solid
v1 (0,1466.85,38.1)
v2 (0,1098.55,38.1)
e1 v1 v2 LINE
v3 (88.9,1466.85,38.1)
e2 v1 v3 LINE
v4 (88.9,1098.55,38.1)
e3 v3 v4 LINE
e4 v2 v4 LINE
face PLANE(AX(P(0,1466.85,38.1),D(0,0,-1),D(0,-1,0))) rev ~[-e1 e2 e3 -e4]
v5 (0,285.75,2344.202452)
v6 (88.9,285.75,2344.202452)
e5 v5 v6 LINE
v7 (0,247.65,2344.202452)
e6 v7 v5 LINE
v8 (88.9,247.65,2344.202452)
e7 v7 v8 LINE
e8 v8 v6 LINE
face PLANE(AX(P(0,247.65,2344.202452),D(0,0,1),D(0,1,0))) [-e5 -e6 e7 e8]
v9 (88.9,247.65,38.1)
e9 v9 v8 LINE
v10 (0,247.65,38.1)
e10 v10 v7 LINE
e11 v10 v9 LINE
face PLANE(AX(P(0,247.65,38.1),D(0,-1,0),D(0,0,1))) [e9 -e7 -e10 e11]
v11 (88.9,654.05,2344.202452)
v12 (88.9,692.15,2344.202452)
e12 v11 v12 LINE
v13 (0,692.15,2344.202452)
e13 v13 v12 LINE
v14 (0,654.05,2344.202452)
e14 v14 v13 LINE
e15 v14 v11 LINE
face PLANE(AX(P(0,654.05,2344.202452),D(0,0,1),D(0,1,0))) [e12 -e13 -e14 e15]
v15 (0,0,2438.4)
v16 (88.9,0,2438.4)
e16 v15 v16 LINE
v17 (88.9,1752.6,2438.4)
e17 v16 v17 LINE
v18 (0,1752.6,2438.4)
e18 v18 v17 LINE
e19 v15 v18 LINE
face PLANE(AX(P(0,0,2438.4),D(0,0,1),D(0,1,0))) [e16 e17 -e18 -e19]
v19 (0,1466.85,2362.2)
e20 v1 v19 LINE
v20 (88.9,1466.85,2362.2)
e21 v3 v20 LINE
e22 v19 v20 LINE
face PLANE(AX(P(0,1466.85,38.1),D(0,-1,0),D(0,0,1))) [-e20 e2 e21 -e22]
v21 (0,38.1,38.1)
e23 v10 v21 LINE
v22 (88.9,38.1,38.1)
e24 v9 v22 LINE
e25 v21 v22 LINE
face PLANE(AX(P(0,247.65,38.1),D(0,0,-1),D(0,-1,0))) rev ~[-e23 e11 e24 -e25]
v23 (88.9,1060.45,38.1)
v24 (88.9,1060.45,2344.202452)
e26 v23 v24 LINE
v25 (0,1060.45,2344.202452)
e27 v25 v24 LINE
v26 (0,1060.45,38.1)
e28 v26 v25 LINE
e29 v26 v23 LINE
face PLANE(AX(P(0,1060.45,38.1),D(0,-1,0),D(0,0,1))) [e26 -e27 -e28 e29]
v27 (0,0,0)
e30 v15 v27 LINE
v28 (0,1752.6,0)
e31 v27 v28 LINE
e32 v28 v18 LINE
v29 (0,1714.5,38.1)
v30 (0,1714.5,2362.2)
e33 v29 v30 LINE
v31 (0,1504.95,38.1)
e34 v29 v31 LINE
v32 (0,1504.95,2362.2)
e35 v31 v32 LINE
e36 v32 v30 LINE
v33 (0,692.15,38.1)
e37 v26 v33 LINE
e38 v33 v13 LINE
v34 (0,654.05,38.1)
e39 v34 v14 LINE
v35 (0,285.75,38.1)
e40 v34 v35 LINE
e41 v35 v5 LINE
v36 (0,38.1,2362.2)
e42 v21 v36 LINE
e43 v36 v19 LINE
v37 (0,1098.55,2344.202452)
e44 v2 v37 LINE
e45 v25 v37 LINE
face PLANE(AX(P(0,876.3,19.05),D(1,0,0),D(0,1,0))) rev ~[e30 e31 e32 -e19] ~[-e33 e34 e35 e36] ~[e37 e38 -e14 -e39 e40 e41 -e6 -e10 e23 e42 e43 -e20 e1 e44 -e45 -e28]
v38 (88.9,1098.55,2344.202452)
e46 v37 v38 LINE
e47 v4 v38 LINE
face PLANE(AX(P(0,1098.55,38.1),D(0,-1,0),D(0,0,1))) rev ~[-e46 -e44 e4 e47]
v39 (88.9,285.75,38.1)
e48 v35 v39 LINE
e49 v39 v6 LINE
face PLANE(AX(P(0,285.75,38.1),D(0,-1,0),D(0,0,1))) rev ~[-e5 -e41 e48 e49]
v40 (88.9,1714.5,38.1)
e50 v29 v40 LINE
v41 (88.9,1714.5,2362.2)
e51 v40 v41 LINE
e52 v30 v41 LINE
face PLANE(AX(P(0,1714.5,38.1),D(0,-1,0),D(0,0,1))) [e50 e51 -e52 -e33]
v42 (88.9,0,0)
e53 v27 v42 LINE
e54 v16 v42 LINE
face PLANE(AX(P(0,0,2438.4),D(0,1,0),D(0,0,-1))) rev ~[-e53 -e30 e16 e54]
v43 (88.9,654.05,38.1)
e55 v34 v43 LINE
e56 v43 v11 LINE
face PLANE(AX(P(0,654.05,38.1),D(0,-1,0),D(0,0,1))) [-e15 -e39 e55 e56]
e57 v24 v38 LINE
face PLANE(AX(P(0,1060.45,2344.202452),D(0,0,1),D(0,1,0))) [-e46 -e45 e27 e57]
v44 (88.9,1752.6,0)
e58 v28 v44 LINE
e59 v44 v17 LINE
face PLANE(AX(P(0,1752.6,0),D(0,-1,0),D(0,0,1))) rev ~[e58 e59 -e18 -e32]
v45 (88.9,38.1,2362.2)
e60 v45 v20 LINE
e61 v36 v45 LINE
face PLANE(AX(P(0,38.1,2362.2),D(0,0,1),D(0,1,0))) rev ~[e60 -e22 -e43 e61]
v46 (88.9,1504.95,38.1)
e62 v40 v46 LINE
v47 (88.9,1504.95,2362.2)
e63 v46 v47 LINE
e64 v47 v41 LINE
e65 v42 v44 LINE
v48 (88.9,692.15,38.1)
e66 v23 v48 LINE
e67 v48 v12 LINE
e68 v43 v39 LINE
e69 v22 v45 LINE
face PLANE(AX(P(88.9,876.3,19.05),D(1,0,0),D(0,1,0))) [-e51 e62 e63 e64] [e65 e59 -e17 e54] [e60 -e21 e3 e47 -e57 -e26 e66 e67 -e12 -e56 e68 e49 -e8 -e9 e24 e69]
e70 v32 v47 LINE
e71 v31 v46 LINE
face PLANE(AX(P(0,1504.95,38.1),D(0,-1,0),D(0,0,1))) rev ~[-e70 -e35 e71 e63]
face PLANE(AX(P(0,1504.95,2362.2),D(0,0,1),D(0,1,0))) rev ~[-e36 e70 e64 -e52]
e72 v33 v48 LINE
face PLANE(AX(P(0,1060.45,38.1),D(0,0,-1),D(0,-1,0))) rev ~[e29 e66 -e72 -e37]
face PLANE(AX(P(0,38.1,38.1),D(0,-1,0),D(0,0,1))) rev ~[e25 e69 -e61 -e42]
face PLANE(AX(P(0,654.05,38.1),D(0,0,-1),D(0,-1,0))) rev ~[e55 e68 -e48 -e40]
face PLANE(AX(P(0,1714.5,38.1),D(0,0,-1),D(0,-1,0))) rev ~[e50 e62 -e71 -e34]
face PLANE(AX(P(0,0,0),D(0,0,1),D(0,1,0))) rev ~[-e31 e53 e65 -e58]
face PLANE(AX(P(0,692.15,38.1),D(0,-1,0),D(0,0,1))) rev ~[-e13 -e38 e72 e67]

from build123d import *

# Parameters (mm, degrees)
F0_W     = 38.1
F0_H     = 2324.1
F0_W_2   = 1752.6
F0_H_2   = 38.1
F0_H_3   = 2306.102451545
F1_DEPTH = 88.9


with BuildPart() as f1:
    # F0 (on Right) → F1 (new body)
    with BuildSketch(Plane.YZ):
        Polygon((0, 38.1), (0, 0), (1752.6, 0), (1752.6, 38.1), (1714.5, 38.1), (1612.9, 38.1), (1504.95, 38.1), (1466.85, 38.1), (1098.55, 38.1), (1060.45, 38.1), (692.15, 38.1), (654.05, 38.1), (285.75, 38.1), (247.65, 38.1), (222.0338093996, 38.1), (215.9, 38.1), (177.8, 38.1), (38.1, 38.1), align=None)
        with Locations((19.05, 1200.15)):
            Rectangle(F0_W, F0_H)
        with Locations((1733.55, 1200.15)):
            Rectangle(F0_W, F0_H)
        Polygon((0, 2400.3), (0, 2362.2), (38.1, 2362.2), (177.8, 2362.2), (183.9338093996, 2362.2), (215.9, 2362.2), (1466.85, 2362.2), (1504.95, 2362.2), (1574.8, 2362.2), (1714.5, 2362.2), (1752.6, 2362.2), (1752.6, 2400.3), align=None)
        with Locations((876.3, 2419.35)):
            Rectangle(F0_W_2, F0_H_2)
        with Locations((1485.9, 1200.15)):
            Rectangle(F0_W, F0_H)
        with Locations((266.7, 1191.1512257725)):
            Rectangle(F0_W, F0_H_3)
        with Locations((1079.5, 1191.1512257725)):
            Rectangle(F0_W, F0_H_3)
        with Locations((673.1, 1191.1512257725)):
            Rectangle(F0_W, F0_H_3)
    extrude(amount=F1_DEPTH)


solid = f1.part
